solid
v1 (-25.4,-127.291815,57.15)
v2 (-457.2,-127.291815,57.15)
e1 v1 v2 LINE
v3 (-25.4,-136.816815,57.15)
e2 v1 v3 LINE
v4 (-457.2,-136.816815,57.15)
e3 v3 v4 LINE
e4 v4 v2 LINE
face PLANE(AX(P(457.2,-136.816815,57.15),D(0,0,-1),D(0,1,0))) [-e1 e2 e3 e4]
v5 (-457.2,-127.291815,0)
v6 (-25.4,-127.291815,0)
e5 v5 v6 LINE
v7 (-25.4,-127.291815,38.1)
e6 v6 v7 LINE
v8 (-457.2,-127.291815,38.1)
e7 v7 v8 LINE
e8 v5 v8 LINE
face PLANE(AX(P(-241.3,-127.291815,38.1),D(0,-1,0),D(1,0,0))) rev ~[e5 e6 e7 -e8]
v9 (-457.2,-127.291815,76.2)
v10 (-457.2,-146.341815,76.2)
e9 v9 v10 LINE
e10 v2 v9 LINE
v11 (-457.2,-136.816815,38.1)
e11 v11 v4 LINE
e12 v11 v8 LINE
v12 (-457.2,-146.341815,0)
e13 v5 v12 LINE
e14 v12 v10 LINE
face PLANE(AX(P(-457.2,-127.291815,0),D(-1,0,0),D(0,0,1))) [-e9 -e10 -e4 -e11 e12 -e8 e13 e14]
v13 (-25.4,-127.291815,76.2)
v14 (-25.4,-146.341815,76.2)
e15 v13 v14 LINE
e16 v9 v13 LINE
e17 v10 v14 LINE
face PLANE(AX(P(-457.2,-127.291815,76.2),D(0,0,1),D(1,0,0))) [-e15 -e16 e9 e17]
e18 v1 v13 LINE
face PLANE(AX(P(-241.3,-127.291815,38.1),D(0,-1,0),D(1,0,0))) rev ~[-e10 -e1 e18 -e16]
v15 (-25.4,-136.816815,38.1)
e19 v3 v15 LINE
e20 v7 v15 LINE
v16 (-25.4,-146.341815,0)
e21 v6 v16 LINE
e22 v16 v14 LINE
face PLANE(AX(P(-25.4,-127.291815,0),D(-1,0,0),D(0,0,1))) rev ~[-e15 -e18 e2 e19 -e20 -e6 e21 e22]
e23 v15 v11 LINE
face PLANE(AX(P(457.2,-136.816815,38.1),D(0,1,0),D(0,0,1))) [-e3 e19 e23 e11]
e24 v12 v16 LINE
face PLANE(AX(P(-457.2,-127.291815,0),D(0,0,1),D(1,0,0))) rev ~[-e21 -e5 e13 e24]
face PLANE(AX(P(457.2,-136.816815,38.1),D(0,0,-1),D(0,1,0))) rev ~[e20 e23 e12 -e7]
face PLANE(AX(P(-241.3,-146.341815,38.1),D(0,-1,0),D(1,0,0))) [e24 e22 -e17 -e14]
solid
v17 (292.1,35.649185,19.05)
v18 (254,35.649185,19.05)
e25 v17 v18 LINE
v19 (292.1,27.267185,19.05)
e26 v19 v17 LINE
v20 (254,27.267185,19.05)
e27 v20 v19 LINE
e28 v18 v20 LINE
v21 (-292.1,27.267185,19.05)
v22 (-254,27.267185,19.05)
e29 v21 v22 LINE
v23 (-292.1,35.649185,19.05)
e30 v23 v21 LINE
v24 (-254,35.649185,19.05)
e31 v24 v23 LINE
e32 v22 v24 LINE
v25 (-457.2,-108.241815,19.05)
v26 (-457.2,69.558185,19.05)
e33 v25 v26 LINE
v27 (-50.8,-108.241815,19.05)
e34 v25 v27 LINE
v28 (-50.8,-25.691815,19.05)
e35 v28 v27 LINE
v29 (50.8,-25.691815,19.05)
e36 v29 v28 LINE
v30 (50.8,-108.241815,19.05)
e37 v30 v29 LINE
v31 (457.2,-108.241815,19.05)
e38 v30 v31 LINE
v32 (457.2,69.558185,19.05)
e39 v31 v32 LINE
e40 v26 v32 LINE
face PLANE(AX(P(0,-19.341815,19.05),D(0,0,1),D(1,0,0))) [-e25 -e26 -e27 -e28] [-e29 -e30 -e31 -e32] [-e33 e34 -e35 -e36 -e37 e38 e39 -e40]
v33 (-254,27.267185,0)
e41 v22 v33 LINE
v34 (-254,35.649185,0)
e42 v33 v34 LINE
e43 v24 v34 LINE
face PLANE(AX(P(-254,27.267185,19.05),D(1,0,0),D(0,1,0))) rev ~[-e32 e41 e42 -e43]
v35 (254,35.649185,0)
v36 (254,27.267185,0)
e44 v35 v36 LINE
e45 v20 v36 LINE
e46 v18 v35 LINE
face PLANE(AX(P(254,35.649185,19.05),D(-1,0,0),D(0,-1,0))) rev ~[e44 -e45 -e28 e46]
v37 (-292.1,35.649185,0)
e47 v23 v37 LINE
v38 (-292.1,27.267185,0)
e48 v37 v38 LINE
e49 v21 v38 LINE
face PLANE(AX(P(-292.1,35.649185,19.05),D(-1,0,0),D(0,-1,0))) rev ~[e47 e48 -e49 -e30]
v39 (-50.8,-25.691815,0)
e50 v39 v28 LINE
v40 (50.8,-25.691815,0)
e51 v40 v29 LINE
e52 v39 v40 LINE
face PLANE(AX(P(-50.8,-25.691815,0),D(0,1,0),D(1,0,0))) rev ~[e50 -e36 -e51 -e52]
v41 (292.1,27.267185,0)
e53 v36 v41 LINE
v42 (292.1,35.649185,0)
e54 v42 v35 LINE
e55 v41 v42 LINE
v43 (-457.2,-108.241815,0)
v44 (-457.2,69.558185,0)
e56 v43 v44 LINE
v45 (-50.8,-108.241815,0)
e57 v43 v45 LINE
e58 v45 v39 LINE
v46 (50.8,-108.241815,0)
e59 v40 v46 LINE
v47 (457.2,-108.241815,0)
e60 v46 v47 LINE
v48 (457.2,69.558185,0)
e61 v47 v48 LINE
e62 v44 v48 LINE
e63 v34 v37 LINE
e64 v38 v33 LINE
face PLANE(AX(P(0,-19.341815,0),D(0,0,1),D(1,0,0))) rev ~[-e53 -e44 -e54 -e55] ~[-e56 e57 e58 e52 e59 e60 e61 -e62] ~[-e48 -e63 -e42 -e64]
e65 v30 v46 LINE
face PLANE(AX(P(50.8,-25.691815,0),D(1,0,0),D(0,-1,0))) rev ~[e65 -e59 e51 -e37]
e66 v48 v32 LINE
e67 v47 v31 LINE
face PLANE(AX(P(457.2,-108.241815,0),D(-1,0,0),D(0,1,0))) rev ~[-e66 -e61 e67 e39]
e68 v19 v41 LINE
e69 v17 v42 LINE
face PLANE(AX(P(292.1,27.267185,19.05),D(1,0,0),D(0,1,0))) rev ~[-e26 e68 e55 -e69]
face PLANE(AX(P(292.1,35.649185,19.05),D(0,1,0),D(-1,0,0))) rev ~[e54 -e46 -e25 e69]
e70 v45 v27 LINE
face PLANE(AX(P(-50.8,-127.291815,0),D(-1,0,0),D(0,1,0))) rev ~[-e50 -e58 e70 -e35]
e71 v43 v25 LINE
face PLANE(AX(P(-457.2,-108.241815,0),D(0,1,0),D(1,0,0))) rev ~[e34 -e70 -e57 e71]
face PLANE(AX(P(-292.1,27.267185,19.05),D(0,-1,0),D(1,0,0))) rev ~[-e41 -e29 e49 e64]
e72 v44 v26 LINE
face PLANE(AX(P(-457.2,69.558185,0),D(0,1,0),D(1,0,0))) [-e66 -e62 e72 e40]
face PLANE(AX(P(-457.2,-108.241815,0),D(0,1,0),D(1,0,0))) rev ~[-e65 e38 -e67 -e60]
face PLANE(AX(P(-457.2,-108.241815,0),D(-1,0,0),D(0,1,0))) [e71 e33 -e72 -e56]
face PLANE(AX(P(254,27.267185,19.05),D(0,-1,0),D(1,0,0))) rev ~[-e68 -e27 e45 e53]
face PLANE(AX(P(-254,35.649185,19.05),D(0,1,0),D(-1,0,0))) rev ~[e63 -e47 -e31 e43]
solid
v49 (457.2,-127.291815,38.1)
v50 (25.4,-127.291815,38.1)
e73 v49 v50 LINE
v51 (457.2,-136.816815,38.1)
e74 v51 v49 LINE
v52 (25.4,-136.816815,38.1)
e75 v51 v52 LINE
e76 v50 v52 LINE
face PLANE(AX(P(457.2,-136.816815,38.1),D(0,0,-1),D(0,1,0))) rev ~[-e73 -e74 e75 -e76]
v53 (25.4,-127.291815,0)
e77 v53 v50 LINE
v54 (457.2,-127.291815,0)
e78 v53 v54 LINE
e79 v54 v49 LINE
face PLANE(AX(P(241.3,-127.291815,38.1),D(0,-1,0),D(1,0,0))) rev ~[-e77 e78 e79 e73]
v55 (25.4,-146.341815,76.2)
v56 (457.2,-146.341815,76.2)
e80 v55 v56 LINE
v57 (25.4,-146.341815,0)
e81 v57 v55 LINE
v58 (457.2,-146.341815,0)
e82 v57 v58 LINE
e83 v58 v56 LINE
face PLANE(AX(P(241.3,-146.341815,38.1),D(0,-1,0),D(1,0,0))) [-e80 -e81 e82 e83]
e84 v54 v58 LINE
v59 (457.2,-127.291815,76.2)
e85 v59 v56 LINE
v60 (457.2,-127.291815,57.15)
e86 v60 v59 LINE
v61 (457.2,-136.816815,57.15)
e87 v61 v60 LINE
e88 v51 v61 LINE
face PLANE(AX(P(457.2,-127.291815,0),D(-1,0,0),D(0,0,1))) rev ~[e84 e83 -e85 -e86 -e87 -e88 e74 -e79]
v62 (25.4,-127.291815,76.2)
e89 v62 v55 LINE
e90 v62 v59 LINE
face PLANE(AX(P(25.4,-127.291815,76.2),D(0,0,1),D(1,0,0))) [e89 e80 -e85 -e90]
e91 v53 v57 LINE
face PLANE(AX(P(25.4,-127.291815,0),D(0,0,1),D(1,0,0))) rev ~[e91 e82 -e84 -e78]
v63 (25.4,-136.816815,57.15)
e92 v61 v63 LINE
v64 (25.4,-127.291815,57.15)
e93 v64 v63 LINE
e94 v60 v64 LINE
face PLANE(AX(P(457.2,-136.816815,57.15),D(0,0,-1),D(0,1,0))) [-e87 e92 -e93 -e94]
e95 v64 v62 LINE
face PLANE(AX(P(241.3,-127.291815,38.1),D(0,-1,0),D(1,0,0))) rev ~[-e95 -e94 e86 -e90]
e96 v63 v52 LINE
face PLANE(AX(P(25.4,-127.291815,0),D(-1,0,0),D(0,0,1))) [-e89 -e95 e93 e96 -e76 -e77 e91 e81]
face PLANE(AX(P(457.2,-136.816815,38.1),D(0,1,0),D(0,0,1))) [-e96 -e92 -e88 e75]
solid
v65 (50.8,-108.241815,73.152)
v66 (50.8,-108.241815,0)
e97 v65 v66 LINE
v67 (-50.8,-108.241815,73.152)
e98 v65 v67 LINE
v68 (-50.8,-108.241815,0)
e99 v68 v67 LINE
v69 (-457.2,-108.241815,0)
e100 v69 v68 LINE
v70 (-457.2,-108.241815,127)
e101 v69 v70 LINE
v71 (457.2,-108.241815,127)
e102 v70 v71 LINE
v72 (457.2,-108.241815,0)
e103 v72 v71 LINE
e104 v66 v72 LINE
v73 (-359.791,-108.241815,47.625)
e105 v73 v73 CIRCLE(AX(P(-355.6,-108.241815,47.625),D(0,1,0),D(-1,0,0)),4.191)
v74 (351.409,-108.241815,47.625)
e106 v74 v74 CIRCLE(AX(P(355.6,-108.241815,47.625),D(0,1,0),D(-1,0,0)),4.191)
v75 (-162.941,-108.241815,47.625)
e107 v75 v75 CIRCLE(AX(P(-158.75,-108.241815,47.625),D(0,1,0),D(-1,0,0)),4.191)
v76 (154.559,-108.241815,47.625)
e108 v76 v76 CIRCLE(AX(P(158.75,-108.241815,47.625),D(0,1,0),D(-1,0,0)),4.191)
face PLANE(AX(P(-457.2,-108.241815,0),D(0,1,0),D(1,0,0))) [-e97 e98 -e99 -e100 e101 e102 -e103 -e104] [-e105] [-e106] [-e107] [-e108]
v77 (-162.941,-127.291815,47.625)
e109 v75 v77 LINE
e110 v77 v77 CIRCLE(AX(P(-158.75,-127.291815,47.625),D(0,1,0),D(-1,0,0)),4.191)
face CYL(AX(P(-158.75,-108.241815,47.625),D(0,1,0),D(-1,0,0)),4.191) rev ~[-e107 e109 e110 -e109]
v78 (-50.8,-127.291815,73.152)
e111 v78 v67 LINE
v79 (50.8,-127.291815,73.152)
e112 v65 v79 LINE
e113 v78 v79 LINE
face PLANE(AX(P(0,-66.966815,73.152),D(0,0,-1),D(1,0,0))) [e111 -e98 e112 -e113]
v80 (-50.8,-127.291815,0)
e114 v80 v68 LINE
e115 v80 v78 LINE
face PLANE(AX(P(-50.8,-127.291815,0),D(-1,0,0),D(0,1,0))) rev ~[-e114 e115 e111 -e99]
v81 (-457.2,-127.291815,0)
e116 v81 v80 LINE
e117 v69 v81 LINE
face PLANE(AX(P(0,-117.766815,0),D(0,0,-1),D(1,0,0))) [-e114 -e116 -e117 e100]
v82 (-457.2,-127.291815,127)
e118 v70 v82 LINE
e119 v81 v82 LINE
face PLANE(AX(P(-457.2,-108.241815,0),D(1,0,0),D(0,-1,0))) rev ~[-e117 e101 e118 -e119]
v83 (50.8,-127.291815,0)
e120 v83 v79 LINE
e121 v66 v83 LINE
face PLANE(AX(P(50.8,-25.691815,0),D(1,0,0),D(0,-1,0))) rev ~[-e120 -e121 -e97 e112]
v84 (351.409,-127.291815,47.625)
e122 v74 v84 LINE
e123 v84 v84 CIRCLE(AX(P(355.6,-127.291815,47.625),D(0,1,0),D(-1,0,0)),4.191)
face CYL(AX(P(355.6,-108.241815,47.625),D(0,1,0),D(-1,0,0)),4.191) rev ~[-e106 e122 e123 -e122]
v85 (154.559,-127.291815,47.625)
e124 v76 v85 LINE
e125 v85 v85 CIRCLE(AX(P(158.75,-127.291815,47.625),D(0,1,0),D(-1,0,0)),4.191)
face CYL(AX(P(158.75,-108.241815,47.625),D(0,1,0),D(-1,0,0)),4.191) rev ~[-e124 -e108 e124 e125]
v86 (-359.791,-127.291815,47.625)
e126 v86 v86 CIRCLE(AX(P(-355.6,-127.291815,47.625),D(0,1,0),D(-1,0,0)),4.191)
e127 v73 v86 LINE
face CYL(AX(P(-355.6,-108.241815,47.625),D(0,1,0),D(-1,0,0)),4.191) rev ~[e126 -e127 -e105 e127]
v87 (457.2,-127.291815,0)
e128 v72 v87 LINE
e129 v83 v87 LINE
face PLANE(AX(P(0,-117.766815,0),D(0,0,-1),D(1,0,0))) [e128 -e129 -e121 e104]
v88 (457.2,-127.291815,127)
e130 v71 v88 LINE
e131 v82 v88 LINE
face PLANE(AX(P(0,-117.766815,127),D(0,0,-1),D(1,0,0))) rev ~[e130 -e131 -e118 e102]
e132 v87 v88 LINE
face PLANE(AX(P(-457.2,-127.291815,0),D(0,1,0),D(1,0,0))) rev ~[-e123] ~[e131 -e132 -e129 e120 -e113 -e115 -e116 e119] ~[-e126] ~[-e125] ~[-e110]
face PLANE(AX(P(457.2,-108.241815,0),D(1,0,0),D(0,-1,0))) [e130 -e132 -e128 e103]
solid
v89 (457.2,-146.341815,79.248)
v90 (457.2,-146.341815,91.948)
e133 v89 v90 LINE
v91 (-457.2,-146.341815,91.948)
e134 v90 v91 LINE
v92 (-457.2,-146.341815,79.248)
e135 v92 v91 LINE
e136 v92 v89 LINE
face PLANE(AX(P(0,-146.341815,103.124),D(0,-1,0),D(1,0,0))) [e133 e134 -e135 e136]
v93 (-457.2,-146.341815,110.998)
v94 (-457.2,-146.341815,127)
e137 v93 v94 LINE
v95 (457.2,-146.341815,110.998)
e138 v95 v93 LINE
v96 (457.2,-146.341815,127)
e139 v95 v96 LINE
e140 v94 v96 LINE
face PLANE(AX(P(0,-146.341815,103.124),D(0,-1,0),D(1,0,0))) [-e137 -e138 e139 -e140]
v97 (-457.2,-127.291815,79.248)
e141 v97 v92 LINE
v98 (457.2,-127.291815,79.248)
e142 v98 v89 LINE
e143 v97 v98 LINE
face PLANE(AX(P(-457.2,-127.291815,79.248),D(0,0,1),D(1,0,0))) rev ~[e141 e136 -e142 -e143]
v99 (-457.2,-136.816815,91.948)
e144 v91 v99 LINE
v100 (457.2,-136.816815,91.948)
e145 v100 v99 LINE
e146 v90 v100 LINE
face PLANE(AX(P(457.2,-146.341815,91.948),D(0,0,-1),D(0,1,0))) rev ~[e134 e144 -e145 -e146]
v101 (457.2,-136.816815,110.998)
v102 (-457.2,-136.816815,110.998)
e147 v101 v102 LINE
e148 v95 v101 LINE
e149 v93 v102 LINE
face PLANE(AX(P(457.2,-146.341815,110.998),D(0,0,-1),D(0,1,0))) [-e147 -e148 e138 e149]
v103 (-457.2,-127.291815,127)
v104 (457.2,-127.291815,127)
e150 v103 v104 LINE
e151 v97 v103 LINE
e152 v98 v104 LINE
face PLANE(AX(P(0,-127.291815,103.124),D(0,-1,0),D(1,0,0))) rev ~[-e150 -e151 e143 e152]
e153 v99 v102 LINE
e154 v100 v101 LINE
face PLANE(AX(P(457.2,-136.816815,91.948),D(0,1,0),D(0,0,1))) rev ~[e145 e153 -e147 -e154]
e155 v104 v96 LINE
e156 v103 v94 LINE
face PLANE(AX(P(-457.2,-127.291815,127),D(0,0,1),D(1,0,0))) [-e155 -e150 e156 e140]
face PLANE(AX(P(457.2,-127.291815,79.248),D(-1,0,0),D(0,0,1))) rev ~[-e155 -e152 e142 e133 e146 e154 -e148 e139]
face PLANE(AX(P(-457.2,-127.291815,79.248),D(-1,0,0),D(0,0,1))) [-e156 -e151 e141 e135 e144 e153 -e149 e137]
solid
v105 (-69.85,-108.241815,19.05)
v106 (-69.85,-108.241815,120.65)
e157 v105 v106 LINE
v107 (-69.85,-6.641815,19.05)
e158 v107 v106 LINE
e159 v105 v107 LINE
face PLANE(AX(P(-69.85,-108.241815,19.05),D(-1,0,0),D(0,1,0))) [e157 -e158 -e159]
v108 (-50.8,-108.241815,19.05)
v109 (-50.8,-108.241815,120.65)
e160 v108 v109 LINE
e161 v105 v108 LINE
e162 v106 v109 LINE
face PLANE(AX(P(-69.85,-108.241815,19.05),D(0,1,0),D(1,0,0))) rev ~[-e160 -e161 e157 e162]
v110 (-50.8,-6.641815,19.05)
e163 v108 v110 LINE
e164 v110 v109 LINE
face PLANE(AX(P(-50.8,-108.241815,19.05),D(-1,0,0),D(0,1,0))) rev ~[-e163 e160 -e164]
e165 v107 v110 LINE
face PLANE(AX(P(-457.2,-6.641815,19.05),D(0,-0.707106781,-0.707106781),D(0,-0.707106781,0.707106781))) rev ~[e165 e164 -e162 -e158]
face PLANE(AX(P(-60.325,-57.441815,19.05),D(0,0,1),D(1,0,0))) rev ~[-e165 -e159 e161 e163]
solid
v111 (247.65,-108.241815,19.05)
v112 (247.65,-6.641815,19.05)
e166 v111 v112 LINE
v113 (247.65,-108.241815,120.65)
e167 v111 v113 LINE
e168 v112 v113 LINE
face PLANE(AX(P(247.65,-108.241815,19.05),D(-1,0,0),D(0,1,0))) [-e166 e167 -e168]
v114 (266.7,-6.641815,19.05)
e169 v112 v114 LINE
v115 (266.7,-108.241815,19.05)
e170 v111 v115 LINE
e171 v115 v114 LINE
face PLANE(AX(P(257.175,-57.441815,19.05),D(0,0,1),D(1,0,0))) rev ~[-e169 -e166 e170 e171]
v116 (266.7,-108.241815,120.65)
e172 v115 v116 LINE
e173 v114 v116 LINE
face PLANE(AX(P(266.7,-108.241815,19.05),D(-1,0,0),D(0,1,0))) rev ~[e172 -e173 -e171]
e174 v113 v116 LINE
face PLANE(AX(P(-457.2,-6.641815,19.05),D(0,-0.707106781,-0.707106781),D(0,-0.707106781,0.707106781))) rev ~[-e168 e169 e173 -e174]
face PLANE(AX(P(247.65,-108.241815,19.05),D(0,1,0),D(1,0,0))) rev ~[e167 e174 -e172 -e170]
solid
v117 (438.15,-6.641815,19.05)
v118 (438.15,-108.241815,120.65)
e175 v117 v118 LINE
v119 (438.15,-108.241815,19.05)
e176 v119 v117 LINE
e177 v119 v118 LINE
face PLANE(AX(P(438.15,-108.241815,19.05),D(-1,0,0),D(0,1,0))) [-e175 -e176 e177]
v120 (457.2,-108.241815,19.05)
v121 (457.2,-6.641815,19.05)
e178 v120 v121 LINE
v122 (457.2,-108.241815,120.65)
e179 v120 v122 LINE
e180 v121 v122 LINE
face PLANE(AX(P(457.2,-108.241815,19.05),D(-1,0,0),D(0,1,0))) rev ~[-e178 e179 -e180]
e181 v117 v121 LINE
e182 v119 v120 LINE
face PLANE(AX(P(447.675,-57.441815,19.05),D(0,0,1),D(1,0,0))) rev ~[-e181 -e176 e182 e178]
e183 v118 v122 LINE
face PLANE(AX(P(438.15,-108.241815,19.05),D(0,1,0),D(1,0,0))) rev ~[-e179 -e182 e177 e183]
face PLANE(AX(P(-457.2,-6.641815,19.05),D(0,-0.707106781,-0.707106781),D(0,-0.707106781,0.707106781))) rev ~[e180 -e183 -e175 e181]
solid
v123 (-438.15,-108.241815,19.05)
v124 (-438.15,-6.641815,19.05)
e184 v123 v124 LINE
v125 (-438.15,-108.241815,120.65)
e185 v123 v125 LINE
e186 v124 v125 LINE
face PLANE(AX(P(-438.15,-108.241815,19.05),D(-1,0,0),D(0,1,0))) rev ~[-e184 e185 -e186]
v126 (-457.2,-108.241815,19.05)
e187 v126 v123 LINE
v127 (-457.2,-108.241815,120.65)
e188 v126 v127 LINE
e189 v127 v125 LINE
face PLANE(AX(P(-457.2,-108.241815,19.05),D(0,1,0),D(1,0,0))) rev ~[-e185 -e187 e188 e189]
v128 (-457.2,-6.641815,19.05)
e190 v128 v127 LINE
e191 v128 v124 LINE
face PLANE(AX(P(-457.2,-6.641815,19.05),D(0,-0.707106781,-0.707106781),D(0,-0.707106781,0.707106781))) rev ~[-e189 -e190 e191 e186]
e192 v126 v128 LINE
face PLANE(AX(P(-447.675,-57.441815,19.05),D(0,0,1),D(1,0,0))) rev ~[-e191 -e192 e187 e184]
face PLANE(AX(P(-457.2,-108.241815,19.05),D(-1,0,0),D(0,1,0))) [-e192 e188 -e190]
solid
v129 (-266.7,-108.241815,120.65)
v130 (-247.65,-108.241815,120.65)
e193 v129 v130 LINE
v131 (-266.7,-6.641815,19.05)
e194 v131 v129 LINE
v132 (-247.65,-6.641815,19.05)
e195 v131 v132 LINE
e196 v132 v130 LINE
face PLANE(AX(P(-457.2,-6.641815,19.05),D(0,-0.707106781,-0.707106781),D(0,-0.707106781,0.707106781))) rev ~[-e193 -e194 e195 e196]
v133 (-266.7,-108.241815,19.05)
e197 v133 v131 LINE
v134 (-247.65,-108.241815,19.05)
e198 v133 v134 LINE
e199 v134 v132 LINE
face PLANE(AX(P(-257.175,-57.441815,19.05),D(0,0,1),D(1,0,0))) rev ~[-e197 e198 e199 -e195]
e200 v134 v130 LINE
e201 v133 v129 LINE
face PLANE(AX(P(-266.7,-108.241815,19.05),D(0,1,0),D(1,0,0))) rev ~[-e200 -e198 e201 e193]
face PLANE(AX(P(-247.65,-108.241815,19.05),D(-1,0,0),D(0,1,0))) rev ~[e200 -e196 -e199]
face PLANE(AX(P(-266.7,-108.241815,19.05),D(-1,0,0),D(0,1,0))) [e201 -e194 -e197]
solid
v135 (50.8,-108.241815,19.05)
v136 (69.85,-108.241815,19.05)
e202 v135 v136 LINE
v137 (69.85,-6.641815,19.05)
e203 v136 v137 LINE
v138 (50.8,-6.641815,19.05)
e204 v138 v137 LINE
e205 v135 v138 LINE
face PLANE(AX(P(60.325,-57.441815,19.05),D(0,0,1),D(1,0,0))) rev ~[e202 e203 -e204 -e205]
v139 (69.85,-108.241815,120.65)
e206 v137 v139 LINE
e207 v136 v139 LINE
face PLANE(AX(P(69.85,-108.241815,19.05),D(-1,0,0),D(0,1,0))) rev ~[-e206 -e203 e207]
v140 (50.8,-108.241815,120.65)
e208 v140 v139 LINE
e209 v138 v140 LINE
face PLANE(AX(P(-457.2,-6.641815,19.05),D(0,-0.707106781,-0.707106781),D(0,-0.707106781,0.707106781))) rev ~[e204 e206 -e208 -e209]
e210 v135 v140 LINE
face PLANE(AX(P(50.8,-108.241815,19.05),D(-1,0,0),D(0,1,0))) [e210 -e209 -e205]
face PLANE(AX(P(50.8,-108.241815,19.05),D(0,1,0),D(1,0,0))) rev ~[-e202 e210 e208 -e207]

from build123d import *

# Parameters (mm, degrees)
F0_W      = 914.4
F0_H      = 177.8
F1_DEPTH  = 19.05
F2_W      = 914.4
F2_H      = 19.05
F3_DEPTH  = 127
F4_W      = 431.8
F4_H      = 76.2
F5_DEPTH  = 19.05
F6_W      = 914.4
F6_H      = 47.752
F7_DEPTH  = 19.05
F8_W      = 9.525
F8_H      = 19.05
F9_DEPTH  = 914.4
F10_W     = 19.05
F10_H     = 101.6
F11_DEPTH = 101.6
F13_DEPTH = 914.4
F14_W     = 101.6
F14_H     = 82.55
F14_H_2   = 19.05
F15_DEPTH = 73.152
F16_W     = 9.525
F16_H     = 19.05
F17_DEPTH = 914.4
F18_R     = 4.191
F19_DEPTH = 19.05
F21_DEPTH = 19.05


# Not quite as in the source:
# - a feature names something its author has since deleted; it is built from what else it names


with BuildPart() as f1:
    # F0 (on Top) → F1 (new body)
    with BuildSketch(Plane.XY):
        with Locations((0, -19.3418145372)):
            Rectangle(F0_W, F0_H)
    extrude(amount=F1_DEPTH)


with BuildPart() as f3:
    # F2 (on face) → F3 (new body)
    with BuildSketch(Plane(origin=(0, 0, 0), x_dir=(1, 0, 0), z_dir=(0, 0, -1))):
        with Locations((0, 117.7668145372)):
            Rectangle(F2_W, F2_H)
    extrude(amount=-F3_DEPTH)


with BuildPart() as f5:
    # F4 (on face) → F5 (new body)
    with BuildSketch(Plane.XZ.offset(127.2918145372)):
        with Locations((-241.3, 38.1)):
            Rectangle(F4_W, F4_H)
    extrude(amount=F5_DEPTH)


with BuildPart() as f5b:
    # F4 (on face) → F5, piece 2 (new body)
    with BuildSketch(Plane.XZ.offset(127.2918145372)):
        with Locations((241.3, 38.1)):
            Rectangle(F4_W, F4_H)
    extrude(amount=F5_DEPTH)


with BuildPart() as f7:
    # F6 (on face) → F7 (new body)
    with BuildSketch(Plane.XZ.offset(127.2918145372)):
        with Locations((0, 103.124)):
            Rectangle(F6_W, F6_H)
    extrude(amount=F7_DEPTH)

    # F8 (on face) → F9 (cut, through all)
    with BuildSketch(Plane.YZ.offset(457.2)):
        with Locations((-141.5793145372, 101.473)):
            Rectangle(F8_W, F8_H)
    extrude(amount=-F9_DEPTH, mode=Mode.SUBTRACT)


with BuildPart() as f11:
    # F10 (on face) → F11 (new body)
    with BuildSketch(Plane.XY.offset(19.05)):
        with Locations((-447.675, -57.4418145372)):
            Rectangle(F10_W, F10_H)
    extrude(amount=F11_DEPTH)


with BuildPart() as f11b:
    # F10 (on face) → F11, piece 2 (new body)
    with BuildSketch(Plane.XY.offset(19.05)):
        with Locations((-257.175, -57.4418145372)):
            Rectangle(F10_W, F10_H)
    extrude(amount=F11_DEPTH)


with BuildPart() as f11c:
    # F10 (on face) → F11, piece 3 (new body)
    with BuildSketch(Plane.XY.offset(19.05)):
        with Locations((-60.325, -57.4418145372)):
            Rectangle(F10_W, F10_H)
    extrude(amount=F11_DEPTH)


with BuildPart() as f11d:
    # F10 (on face) → F11, piece 4 (new body)
    with BuildSketch(Plane.XY.offset(19.05)):
        with Locations((60.325, -57.4418145372)):
            Rectangle(F10_W, F10_H)
    extrude(amount=F11_DEPTH)


with BuildPart() as f11e:
    # F10 (on face) → F11, piece 5 (new body)
    with BuildSketch(Plane.XY.offset(19.05)):
        with Locations((257.175, -57.4418145372)):
            Rectangle(F10_W, F10_H)
    extrude(amount=F11_DEPTH)


with BuildPart() as f11f:
    # F10 (on face) → F11, piece 6 (new body)
    with BuildSketch(Plane.XY.offset(19.05)):
        with Locations((447.675, -57.4418145372)):
            Rectangle(F10_W, F10_H)
    extrude(amount=F11_DEPTH)


with BuildPart() as f13_tool:
    # F12 (on face) → F13 (new body, through all)
    with BuildSketch(Plane(origin=(-457.2, 0, 0), x_dir=(0, -1, 0), z_dir=(-1, 0, 0))):
        Polygon((6.6418145372, 120.65), (6.6418145372, 19.05), (108.2418145372, 120.65), align=None)
    extrude(amount=-F13_DEPTH)


with BuildPart() as f11_1:
    add(f11.part)

    # F13: cut by f13_tool
    add(f13_tool.part, mode=Mode.SUBTRACT)


with BuildPart() as f11b_1:
    add(f11b.part)

    # F13: cut by f13_tool
    add(f13_tool.part, mode=Mode.SUBTRACT)


with BuildPart() as f11c_1:
    add(f11c.part)

    # F13: cut by f13_tool
    add(f13_tool.part, mode=Mode.SUBTRACT)


with BuildPart() as f11d_1:
    add(f11d.part)

    # F13: cut by f13_tool
    add(f13_tool.part, mode=Mode.SUBTRACT)


with BuildPart() as f11e_1:
    add(f11e.part)

    # F13: cut by f13_tool
    add(f13_tool.part, mode=Mode.SUBTRACT)


with BuildPart() as f11f_1:
    add(f11f.part)

    # F13: cut by f13_tool
    add(f13_tool.part, mode=Mode.SUBTRACT)


with BuildPart() as f15_tool:
    # F14 (on face) → F15 (new body)
    with BuildSketch(Plane(origin=(0, 0, 0), x_dir=(1, 0, 0), z_dir=(0, 0, -1))):
        with Locations((0, 66.9668145372)):
            Rectangle(F14_W, F14_H)
        with Locations((0, 117.7668145372)):
            Rectangle(F14_W, F14_H_2)
    extrude(amount=-F15_DEPTH)


with BuildPart() as f1_1:
    add(f1.part)

    # F15: cut by f15_tool
    add(f15_tool.part, mode=Mode.SUBTRACT)

    # F20 (on face) → F21 (cut, through all)
    with BuildSketch(Plane.XY.offset(19.05)):
        Polygon((-254, 35.6491854628), (-273.05, 35.6491854628), (-292.1, 35.6491854628), (-292.1, 27.2671854628), (-254, 27.2671854628), align=None)
        Polygon((292.1, 35.6491854628), (273.05, 35.6491854628), (254, 35.6491854628), (254, 27.2671854628), (292.1, 27.2671854628), align=None)
    extrude(amount=-F21_DEPTH, mode=Mode.SUBTRACT)


with BuildPart() as f3_1:
    add(f3.part)

    # F15: cut by f15_tool
    add(f15_tool.part, mode=Mode.SUBTRACT)

    # F18 (on face) → F19 (cut)
    with BuildSketch(Plane(origin=(0, -108.2418145372, 0), x_dir=(-1, 0, 0), z_dir=(0, 1, 0))):
        with Locations((-355.6, 47.625)):
            Circle(F18_R)
        with Locations((158.75, 47.625)):
            Circle(F18_R)
        with Locations((355.6, 47.625)):
            Circle(F18_R)
        with Locations((-158.75, 47.625)):
            Circle(F18_R)
    extrude(amount=-F19_DEPTH, mode=Mode.SUBTRACT)


with BuildPart() as f17_tool:
    # F16 (on face) → F17 (new body, through all)
    with BuildSketch(Plane.YZ.offset(457.2)):
        with Locations((-132.0543145372, 47.625)):
            Rectangle(F16_W, F16_H)
    extrude(amount=-F17_DEPTH)


with BuildPart() as f5_1:
    add(f5.part)

    # F17: cut by f17_tool
    add(f17_tool.part, mode=Mode.SUBTRACT)


with BuildPart() as f5b_1:
    add(f5b.part)

    # F17: cut by f17_tool
    add(f17_tool.part, mode=Mode.SUBTRACT)


solid = Compound([f7.part, f11_1.part, f11b_1.part, f11c_1.part, f11d_1.part, f11e_1.part, f11f_1.part, f1_1.part, f3_1.part, f5_1.part, f5b_1.part])
